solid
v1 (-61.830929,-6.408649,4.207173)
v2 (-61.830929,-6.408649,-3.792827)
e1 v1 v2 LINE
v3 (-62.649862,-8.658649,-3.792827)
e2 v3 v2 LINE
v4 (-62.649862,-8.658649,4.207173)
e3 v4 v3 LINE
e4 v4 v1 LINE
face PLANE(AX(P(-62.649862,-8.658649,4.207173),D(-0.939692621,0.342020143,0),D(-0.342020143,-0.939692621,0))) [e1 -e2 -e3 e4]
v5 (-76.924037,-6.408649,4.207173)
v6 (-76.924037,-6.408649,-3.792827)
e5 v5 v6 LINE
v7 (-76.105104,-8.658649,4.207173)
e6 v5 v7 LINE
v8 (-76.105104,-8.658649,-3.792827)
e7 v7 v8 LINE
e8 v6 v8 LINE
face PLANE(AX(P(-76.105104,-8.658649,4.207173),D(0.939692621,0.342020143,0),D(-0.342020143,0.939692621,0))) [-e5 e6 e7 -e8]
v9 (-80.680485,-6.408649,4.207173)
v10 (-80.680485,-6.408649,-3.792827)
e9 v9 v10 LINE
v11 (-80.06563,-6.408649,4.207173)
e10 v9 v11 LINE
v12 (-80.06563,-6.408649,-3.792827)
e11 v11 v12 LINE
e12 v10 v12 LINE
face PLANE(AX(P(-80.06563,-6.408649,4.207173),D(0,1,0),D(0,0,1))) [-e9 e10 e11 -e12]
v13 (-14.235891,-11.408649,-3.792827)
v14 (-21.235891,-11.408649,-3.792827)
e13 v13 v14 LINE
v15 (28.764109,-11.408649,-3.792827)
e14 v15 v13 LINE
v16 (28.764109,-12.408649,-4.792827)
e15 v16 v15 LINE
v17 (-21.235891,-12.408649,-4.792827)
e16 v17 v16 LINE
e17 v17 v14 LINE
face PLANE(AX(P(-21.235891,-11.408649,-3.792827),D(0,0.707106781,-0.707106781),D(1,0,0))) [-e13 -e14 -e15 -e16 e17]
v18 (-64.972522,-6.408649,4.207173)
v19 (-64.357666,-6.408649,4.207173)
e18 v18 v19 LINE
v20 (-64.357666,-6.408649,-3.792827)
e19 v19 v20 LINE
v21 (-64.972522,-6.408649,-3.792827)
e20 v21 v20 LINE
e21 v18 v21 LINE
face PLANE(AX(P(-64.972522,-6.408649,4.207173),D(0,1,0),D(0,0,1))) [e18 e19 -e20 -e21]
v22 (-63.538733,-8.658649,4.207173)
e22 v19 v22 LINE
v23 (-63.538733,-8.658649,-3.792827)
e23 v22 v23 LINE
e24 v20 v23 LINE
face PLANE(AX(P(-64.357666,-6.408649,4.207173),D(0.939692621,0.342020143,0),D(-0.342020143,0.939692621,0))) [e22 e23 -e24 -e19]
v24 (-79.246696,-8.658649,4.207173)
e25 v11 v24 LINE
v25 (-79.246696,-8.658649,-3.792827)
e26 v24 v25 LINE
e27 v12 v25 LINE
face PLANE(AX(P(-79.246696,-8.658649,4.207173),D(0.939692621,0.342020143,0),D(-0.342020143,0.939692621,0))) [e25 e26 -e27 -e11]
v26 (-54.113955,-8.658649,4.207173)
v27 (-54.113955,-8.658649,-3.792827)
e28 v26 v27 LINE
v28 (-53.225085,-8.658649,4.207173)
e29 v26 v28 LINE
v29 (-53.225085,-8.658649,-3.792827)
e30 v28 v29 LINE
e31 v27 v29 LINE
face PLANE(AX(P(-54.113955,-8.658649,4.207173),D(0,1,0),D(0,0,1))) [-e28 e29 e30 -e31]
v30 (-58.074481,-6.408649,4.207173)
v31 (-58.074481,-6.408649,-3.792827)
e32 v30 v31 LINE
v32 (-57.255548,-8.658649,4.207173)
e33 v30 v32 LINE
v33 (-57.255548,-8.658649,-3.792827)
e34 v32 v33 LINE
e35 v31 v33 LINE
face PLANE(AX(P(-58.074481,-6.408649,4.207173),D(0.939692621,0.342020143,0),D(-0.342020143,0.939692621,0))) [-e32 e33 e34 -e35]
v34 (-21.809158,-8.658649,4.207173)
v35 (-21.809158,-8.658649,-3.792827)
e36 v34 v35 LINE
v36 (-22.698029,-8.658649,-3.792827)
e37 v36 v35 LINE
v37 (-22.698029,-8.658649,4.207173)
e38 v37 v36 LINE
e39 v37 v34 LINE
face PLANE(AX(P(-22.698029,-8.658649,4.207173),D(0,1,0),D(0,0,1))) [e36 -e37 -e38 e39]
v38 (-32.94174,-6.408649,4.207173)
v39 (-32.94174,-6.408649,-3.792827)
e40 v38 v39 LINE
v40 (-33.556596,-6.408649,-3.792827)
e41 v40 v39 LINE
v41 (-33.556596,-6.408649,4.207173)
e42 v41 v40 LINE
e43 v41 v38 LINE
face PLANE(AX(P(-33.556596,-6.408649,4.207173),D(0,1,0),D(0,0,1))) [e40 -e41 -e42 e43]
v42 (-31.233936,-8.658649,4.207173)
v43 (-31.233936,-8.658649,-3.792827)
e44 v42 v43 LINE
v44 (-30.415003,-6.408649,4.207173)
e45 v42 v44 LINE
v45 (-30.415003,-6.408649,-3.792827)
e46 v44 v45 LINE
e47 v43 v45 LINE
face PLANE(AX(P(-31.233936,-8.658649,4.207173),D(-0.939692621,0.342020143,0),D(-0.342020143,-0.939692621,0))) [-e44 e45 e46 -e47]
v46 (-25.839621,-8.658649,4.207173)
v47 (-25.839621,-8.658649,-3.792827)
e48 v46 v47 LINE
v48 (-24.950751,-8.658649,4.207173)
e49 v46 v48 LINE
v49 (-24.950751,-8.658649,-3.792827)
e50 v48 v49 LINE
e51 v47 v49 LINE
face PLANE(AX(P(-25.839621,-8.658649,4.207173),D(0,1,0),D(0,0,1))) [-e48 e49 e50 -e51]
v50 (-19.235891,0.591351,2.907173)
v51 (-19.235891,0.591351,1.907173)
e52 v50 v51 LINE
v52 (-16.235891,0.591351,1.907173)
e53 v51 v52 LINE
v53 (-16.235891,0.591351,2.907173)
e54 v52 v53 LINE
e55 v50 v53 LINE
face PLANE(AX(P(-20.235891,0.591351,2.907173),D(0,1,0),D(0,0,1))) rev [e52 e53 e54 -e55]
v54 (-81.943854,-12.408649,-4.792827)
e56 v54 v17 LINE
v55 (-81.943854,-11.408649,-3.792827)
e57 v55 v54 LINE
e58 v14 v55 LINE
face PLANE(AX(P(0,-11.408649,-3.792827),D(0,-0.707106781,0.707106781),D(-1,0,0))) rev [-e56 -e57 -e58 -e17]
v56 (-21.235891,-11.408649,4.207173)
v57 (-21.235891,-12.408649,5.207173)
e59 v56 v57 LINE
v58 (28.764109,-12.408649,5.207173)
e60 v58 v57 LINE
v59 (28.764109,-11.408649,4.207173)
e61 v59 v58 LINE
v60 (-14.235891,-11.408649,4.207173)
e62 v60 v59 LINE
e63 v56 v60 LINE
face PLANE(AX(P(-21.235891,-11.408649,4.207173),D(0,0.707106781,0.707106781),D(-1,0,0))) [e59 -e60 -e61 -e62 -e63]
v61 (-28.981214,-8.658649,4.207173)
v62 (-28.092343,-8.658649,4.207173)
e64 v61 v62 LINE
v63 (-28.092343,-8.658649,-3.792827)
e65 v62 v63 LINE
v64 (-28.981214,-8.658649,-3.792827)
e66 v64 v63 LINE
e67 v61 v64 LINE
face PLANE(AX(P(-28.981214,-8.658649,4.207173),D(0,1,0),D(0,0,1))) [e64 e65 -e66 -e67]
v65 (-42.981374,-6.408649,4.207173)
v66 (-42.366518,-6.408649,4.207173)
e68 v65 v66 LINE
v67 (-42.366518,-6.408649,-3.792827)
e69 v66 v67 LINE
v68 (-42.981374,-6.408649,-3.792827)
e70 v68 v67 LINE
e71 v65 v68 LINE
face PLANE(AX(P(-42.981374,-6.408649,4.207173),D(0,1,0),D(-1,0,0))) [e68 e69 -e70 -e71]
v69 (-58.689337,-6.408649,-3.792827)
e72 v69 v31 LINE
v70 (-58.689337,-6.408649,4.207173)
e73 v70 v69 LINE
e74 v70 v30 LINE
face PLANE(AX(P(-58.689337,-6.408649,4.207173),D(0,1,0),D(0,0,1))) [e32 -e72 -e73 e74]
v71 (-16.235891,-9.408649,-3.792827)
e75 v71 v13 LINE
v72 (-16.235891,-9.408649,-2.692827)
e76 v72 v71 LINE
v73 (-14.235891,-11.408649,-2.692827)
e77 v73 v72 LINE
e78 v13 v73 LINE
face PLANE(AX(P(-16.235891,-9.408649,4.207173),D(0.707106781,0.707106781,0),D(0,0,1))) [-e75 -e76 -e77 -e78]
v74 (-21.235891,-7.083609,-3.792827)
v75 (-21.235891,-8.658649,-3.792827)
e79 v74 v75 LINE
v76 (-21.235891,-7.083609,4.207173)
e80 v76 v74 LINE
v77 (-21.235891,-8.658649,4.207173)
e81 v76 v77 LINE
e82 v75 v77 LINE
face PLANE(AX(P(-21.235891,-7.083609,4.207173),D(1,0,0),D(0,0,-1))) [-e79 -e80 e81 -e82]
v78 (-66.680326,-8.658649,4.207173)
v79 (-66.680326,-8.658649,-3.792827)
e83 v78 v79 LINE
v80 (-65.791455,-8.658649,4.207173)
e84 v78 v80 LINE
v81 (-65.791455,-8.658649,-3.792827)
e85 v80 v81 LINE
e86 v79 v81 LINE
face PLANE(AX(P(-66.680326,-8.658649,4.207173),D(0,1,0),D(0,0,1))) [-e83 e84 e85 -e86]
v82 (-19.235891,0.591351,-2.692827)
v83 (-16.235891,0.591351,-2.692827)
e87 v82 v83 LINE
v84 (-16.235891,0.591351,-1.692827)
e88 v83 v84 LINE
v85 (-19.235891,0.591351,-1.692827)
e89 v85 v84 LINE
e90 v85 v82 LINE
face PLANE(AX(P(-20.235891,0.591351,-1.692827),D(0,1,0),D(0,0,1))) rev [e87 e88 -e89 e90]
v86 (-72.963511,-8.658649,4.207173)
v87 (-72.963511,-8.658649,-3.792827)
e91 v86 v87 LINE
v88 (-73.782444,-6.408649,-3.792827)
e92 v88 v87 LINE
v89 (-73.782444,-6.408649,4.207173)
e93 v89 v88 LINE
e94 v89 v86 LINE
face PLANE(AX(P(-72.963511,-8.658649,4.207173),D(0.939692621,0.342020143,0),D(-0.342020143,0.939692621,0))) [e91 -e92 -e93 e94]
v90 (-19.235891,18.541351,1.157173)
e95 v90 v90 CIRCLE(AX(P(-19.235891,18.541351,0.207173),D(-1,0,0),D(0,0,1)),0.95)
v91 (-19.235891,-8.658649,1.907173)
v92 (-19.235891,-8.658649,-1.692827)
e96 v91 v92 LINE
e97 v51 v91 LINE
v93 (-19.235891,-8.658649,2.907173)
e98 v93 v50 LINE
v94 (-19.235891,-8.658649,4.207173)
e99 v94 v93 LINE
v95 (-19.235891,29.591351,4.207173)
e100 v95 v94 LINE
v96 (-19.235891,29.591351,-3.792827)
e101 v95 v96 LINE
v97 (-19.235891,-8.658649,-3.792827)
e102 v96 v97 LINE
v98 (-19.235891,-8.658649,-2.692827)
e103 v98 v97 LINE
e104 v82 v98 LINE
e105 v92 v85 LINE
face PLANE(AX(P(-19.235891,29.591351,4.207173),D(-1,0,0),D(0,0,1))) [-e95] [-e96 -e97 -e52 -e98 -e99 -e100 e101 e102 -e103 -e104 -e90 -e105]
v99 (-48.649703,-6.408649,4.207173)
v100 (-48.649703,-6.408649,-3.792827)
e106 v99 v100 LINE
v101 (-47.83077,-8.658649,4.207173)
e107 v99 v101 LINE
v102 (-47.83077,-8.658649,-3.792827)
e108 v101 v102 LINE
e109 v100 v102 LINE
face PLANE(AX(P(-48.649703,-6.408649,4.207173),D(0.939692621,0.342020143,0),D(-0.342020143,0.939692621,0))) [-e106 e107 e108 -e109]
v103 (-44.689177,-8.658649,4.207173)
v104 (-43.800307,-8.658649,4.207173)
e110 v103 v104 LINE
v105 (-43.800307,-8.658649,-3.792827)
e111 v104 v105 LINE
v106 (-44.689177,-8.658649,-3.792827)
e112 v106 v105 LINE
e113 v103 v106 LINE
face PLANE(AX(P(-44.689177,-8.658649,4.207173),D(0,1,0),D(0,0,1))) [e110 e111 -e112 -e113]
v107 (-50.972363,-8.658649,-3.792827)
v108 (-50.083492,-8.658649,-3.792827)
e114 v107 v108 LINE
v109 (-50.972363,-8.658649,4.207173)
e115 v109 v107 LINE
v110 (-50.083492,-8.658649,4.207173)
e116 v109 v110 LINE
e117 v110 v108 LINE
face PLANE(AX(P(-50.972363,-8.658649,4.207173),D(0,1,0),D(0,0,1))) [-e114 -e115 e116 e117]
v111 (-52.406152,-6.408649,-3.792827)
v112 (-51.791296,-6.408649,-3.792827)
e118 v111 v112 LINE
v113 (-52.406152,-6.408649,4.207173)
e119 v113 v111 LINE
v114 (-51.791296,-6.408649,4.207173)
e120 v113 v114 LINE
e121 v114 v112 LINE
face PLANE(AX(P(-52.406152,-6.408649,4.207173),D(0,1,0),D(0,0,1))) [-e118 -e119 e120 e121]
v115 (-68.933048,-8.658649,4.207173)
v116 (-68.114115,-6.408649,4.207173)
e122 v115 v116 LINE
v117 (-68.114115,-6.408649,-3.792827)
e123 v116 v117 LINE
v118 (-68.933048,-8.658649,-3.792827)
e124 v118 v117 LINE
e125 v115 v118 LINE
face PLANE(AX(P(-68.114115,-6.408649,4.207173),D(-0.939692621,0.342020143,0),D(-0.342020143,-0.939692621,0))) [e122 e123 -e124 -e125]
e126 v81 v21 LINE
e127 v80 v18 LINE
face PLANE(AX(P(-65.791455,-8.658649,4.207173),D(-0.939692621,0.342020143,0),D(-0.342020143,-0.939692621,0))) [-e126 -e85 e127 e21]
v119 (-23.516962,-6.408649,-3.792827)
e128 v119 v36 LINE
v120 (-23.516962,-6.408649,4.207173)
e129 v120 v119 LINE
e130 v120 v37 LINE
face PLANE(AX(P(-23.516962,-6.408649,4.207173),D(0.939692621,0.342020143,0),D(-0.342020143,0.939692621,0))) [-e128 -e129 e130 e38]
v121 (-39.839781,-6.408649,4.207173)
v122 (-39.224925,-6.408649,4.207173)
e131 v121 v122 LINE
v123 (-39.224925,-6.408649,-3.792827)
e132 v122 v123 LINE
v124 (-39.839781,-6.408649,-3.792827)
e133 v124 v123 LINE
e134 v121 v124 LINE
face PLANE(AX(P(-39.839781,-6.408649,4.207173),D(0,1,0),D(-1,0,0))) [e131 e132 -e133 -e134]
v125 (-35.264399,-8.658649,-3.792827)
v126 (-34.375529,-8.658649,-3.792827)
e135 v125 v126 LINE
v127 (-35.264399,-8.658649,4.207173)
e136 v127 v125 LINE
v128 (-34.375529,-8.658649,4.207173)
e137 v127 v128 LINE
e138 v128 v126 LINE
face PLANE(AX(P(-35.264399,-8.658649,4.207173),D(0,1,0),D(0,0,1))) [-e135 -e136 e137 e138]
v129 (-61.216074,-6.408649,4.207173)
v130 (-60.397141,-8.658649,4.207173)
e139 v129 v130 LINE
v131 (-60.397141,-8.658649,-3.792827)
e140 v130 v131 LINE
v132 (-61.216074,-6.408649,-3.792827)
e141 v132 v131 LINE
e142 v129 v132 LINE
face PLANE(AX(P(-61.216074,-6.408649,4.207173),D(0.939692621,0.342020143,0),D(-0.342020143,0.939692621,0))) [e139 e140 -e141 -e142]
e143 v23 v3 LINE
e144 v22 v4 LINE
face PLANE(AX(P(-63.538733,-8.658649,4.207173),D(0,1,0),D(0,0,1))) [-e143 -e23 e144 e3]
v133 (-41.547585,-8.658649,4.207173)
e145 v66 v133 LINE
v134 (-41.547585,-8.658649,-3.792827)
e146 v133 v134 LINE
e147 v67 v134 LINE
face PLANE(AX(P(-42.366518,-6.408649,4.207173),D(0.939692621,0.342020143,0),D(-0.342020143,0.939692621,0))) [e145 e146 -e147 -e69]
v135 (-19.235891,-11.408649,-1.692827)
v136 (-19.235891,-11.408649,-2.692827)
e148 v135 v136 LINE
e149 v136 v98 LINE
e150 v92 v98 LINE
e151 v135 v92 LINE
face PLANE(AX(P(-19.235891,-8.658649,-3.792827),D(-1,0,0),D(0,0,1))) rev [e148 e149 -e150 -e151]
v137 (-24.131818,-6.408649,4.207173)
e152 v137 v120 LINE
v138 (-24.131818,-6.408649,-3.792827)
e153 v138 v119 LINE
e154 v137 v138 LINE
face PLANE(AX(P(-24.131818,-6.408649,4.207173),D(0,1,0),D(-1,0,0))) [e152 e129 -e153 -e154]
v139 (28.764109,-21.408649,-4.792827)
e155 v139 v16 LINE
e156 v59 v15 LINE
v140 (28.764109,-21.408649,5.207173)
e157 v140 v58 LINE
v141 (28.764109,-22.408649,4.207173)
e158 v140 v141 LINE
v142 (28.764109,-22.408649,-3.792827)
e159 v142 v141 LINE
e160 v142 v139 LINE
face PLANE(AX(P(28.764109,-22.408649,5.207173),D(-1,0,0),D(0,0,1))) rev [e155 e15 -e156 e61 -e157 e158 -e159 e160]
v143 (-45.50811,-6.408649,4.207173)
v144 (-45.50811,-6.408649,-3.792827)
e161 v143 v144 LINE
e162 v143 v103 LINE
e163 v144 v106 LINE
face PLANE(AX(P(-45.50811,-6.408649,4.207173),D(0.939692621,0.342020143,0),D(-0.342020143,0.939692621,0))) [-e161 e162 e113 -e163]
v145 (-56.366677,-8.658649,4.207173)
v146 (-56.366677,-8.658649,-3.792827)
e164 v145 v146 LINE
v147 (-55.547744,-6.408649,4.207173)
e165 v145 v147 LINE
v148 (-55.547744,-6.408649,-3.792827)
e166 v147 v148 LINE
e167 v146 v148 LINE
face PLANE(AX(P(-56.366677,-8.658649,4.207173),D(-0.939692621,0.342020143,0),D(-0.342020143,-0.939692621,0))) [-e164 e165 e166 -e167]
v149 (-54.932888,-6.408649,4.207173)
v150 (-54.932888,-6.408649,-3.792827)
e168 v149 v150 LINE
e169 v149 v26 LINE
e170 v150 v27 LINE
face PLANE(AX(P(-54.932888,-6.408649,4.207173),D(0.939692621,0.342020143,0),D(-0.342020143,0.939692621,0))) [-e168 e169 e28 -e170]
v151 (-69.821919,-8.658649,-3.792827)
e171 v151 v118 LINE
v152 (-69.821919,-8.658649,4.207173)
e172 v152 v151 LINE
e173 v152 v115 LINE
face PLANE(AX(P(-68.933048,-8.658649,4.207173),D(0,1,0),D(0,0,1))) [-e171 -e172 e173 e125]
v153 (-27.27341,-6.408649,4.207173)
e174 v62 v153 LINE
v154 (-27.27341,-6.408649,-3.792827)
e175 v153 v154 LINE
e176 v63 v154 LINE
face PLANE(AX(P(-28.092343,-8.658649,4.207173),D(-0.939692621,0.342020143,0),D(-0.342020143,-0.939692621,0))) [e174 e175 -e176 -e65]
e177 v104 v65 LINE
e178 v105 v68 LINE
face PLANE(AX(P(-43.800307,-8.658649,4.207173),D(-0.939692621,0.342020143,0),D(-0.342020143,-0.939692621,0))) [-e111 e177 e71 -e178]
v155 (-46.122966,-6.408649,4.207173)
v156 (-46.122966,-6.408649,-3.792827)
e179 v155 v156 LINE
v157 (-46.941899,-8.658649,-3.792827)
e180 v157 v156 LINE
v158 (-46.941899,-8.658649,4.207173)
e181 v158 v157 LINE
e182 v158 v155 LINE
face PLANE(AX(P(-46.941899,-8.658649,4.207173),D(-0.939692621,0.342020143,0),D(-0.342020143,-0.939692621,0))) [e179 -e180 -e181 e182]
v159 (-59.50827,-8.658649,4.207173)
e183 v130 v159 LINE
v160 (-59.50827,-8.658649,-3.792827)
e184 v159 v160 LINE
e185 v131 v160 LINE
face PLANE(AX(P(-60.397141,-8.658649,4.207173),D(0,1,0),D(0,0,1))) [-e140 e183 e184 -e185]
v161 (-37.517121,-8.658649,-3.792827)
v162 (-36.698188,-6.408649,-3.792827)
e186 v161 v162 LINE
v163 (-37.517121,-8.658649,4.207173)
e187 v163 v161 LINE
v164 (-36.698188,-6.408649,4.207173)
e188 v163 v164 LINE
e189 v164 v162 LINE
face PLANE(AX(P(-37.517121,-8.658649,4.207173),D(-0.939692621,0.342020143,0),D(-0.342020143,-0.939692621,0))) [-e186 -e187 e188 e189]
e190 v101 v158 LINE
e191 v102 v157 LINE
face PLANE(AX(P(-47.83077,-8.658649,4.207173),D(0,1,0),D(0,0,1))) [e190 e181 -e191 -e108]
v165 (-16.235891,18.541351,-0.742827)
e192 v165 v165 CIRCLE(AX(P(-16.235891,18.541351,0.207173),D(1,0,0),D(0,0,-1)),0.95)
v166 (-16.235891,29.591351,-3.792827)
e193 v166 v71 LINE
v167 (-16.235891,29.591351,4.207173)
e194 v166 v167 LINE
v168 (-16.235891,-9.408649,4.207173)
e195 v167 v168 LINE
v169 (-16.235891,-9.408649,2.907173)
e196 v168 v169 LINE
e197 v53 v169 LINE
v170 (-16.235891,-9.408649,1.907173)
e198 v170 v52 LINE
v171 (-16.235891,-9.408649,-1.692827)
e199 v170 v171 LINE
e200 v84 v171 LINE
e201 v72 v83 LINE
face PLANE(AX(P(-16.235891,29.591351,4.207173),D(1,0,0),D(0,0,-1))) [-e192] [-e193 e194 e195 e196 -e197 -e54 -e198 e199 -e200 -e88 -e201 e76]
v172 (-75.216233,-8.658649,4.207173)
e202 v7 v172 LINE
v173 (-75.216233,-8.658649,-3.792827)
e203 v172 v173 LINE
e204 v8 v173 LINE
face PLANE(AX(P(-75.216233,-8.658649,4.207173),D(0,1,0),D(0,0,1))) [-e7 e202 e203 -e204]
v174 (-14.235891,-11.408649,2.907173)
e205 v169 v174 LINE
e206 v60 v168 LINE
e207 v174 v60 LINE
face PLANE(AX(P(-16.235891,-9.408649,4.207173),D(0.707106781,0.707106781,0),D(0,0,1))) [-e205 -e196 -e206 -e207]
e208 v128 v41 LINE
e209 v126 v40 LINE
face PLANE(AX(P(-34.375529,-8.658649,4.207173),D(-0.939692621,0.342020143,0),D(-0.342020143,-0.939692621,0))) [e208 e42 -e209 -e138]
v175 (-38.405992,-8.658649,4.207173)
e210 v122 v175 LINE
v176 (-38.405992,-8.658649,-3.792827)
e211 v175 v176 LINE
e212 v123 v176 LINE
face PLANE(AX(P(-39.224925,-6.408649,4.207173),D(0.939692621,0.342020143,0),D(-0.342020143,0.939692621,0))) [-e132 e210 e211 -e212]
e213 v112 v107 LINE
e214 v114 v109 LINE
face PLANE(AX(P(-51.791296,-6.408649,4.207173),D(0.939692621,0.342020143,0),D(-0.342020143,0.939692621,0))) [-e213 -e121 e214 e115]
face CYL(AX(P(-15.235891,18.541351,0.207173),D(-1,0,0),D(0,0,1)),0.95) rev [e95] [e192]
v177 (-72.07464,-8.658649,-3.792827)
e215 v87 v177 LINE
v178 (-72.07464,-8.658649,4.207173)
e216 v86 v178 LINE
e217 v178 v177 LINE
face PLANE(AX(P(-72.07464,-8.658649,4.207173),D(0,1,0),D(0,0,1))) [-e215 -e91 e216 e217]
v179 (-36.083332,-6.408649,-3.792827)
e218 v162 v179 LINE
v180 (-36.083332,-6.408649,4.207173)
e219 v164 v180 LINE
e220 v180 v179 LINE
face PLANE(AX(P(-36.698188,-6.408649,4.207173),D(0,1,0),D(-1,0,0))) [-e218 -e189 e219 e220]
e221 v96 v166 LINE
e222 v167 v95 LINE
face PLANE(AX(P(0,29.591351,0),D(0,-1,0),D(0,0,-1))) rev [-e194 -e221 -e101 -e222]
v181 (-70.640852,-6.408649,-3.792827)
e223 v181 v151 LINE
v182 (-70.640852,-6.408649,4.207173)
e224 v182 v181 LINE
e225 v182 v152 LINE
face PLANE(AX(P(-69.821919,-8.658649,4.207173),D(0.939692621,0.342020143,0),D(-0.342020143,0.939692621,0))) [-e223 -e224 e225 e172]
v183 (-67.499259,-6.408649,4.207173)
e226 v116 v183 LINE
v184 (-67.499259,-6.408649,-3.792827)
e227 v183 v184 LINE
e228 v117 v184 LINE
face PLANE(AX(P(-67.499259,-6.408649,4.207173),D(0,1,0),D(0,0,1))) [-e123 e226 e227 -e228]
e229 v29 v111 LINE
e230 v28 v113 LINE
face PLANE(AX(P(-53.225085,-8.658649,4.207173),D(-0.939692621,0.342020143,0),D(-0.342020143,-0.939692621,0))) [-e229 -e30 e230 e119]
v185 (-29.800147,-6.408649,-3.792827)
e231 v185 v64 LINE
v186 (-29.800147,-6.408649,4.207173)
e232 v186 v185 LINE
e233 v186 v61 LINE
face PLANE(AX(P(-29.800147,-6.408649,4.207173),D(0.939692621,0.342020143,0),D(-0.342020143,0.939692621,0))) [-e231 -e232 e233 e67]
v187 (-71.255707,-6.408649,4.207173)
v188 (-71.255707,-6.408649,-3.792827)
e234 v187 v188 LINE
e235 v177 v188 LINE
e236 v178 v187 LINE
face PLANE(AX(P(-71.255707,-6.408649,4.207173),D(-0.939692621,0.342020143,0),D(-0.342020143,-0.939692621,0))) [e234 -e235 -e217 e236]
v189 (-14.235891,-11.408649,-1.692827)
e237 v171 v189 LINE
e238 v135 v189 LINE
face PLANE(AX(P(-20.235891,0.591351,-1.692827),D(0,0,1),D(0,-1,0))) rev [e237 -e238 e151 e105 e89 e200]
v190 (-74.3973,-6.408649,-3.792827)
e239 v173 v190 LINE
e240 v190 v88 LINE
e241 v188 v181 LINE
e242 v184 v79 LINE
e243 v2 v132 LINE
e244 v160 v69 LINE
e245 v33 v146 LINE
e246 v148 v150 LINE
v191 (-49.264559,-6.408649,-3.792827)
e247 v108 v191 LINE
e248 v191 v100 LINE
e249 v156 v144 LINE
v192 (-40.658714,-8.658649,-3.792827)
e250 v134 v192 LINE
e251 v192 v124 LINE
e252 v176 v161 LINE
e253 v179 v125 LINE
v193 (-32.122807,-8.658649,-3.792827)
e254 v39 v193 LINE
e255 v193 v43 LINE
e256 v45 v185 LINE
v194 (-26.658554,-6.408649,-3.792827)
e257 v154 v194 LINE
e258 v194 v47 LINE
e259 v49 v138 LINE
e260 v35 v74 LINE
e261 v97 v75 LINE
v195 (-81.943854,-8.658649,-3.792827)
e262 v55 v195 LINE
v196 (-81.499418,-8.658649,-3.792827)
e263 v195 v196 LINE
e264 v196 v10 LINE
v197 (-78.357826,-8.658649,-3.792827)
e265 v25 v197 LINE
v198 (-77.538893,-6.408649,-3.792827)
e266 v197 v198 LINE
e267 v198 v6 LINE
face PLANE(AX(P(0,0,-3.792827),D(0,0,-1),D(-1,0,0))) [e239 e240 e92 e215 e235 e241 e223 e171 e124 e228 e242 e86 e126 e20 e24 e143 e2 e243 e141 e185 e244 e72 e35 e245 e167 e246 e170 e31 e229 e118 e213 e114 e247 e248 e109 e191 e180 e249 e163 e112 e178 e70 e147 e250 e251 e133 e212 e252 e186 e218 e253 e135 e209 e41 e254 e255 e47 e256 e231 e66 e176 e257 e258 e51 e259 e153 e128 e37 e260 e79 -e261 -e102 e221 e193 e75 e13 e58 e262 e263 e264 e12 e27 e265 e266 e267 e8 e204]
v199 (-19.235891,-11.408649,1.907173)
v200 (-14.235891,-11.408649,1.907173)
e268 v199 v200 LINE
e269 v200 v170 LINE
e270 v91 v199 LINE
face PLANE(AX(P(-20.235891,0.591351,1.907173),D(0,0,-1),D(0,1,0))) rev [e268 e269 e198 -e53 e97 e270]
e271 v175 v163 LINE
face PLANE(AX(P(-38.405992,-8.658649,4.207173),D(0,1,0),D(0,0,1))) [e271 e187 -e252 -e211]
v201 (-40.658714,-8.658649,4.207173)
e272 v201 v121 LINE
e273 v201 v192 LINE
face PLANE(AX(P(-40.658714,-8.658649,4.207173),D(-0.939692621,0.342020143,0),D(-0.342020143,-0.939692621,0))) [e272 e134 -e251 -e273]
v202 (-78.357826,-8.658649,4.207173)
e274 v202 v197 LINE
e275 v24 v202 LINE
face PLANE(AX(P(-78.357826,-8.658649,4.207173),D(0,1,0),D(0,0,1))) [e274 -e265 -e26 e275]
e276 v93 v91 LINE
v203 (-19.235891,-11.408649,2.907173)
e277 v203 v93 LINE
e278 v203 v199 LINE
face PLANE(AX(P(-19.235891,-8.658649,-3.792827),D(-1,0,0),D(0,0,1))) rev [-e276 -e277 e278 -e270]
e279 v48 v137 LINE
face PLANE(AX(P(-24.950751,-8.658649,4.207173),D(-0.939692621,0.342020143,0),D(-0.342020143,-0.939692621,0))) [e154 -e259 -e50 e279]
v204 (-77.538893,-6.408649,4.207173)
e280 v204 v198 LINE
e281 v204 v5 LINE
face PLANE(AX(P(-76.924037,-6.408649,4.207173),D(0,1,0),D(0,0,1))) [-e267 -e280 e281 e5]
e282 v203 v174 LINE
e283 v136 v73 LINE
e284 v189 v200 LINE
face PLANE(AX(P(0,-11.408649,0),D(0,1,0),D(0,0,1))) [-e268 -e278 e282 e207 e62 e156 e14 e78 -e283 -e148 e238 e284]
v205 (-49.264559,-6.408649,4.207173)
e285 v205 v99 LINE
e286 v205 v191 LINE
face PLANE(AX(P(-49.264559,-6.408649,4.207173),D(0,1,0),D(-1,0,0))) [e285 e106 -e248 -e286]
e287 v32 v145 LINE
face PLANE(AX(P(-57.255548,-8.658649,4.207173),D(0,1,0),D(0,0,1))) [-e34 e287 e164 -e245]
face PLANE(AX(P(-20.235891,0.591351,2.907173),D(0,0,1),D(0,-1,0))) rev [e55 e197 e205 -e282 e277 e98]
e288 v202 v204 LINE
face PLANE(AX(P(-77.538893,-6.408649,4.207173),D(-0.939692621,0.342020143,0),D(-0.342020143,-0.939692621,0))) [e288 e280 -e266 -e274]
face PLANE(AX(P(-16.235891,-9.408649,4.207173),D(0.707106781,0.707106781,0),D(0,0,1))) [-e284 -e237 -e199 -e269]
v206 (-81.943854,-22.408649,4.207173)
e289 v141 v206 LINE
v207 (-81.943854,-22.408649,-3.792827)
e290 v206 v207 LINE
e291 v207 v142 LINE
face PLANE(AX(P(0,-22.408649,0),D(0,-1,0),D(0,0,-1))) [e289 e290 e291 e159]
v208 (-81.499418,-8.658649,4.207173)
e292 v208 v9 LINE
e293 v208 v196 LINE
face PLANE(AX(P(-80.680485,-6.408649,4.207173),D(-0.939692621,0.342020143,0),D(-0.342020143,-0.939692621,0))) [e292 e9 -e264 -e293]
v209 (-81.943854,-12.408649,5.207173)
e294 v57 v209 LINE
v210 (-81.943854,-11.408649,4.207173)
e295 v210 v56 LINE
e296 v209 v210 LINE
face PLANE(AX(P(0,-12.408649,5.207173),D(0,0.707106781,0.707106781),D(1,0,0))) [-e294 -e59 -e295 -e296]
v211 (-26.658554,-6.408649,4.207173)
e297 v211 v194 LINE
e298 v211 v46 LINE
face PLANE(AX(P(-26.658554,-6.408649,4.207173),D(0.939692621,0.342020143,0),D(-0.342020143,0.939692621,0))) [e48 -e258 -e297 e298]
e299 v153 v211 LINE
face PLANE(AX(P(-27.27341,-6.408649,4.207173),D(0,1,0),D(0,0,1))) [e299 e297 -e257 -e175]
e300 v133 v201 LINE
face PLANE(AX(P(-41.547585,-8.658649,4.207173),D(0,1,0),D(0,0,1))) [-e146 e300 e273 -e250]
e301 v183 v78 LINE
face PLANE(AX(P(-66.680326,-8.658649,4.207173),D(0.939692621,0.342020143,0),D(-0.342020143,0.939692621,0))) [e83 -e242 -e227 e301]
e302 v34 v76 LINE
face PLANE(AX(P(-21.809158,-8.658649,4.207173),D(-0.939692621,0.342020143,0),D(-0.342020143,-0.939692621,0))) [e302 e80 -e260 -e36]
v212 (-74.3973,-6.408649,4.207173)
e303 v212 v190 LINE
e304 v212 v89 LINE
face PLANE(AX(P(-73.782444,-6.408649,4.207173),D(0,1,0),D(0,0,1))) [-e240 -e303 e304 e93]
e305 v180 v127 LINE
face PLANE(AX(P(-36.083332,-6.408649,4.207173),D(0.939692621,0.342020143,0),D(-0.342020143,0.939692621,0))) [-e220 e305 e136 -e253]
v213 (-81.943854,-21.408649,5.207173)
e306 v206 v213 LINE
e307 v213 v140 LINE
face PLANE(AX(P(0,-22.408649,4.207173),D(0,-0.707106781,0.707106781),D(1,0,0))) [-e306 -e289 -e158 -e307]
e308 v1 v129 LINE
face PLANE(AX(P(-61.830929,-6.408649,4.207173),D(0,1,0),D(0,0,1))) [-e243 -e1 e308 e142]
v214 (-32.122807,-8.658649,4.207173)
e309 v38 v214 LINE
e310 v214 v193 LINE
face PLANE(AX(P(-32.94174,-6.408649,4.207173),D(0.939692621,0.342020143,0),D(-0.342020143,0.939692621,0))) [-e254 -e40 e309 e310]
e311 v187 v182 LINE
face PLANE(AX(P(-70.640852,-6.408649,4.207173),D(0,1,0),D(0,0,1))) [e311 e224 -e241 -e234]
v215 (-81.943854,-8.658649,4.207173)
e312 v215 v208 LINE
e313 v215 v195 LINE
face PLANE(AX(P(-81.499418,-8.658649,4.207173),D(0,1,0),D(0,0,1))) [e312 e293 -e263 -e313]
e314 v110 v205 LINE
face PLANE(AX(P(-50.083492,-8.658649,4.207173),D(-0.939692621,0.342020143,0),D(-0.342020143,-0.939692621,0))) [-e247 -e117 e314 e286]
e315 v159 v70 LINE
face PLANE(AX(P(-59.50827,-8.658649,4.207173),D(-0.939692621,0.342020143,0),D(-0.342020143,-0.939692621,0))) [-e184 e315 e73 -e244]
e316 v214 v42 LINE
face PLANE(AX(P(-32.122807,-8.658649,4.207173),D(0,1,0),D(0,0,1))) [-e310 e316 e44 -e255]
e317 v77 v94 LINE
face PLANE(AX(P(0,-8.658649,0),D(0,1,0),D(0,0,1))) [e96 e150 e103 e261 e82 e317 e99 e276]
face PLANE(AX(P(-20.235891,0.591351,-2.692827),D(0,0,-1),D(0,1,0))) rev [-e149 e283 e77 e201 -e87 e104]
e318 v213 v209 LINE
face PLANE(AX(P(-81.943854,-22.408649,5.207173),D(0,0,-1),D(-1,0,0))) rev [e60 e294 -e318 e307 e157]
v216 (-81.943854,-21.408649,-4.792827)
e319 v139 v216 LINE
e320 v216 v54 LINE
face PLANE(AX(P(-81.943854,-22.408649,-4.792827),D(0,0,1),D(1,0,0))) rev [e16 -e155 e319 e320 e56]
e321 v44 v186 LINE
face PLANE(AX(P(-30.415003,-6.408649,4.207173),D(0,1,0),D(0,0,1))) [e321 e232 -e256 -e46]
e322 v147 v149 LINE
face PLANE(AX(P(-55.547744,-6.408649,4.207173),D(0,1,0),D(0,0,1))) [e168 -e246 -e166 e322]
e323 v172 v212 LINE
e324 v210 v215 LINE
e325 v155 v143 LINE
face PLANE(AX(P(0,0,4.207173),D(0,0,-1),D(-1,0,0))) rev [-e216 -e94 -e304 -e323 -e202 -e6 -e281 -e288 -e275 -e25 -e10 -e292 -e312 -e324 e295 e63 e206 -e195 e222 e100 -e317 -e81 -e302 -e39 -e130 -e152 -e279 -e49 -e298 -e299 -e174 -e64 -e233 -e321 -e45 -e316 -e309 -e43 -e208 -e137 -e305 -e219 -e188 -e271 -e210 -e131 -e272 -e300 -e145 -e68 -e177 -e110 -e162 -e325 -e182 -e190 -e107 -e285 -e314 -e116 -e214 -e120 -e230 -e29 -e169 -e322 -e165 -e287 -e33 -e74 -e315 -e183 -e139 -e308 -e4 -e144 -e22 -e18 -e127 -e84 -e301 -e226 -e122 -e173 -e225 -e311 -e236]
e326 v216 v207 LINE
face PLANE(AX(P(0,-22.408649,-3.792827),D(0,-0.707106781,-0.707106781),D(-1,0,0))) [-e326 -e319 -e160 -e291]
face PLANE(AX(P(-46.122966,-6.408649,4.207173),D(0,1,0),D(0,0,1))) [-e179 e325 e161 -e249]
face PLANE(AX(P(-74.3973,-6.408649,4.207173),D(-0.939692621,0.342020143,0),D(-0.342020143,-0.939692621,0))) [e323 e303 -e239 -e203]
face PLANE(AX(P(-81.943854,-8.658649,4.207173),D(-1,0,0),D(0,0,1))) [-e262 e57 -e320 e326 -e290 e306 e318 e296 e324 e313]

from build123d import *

# Parameters (mm, degrees)
BOSS_EXTRUDE1_DEPTH = 8
SKETCH2_W           = 110.70796325
SKETCH2_H           = 10
BOSS_EXTRUDE2_DEPTH = 10
CHAMFER1_SIZE       = 1
CHAMFER2_SIZE       = 1
SKETCH3_W           = 50
SKETCH3_H           = 8
BOSS_EXTRUDE3_DEPTH = 1
CHAMFER3_SIZE       = 1
CHAMFER4_SIZE       = 1
SKETCH4_W           = 3
SKETCH4_H           = 8
BOSS_EXTRUDE6_DEPTH = 52
SKETCH10_W          = 1
SKETCH10_H          = 12
CUT_EXTRUDE4_DEPTH  = 4
CHAMFER7_SIZE       = 2
SKETCH12_R          = 0.95
CUT_EXTRUDE5_DEPTH  = 4
CHAMFER8_SIZE       = 1
SKETCH13_W          = 2
SKETCH13_H          = 8
BOSS_EXTRUDE7_DEPTH = 2.75


# Some blends are built 0.0001 mm under size
with BuildPart() as part:
    # Sketch1 → Boss-Extrude1 (new body)
    with BuildSketch(Plane(origin=(0, 0, -3.792826984), x_dir=(-1, 0, 0), z_dir=(0, 0, -1))):
        Polygon((23.516961809, -6.40864854), (22.698028781, -8.65864854), (21.809158042, -8.65864854), (21.235890512, -7.083608945), (21.235890512, -12.40864854), (66.235890512, -12.40864854), (81.943853762, -12.40864854), (81.943853762, -8.65864854), (81.499418392, -8.65864854), (80.680485365, -6.40864854), (80.065629509, -6.40864854), (79.246696481, -8.65864854), (78.357825742, -8.65864854), (77.538892715, -6.40864854), (76.924036859, -6.40864854), (76.105103831, -8.65864854), (75.216233092, -8.65864854), (74.397300065, -6.40864854), (73.782444209, -6.40864854), (72.963511181, -8.65864854), (72.074640442, -8.65864854), (71.255707415, -6.40864854), (70.640851559, -6.40864854), (69.821918531, -8.65864854), (68.933047792, -8.65864854), (68.114114765, -6.40864854), (67.499258909, -6.40864854), (66.680325881, -8.65864854), (65.791455142, -8.65864854), (64.972522115, -6.40864854), (64.357666259, -6.40864854), (63.538733231, -8.65864854), (62.649862492, -8.65864854), (61.830929465, -6.40864854), (61.216073609, -6.40864854), (60.397140581, -8.65864854), (59.508269842, -8.65864854), (58.689336815, -6.40864854), (58.074480959, -6.40864854), (57.255547931, -8.65864854), (56.366677192, -8.65864854), (55.547744165, -6.40864854), (54.932888309, -6.40864854), (54.113955281, -8.65864854), (53.225084542, -8.65864854), (52.406151515, -6.40864854), (51.791295659, -6.40864854), (50.972362631, -8.65864854), (50.083491892, -8.65864854), (49.264558865, -6.40864854), (48.649703009, -6.40864854), (47.830769981, -8.65864854), (46.941899242, -8.65864854), (46.122966215, -6.40864854), (45.508110359, -6.40864854), (44.689177331, -8.65864854), (43.800306592, -8.65864854), (42.981373565, -6.40864854), (42.366517709, -6.40864854), (41.547584681, -8.65864854), (40.658713942, -8.65864854), (39.839780915, -6.40864854), (39.224925059, -6.40864854), (38.405992031, -8.65864854), (37.517121292, -8.65864854), (36.698188265, -6.40864854), (36.083332409, -6.40864854), (35.264399381, -8.65864854), (34.375528642, -8.65864854), (33.556595615, -6.40864854), (32.941739759, -6.40864854), (32.122806731, -8.65864854), (31.233935992, -8.65864854), (30.415002965, -6.40864854), (29.800147109, -6.40864854), (28.981214081, -8.65864854), (28.092343342, -8.65864854), (27.273410315, -6.40864854), (26.658554459, -6.40864854), (25.839621431, -8.65864854), (24.950750692, -8.65864854), (24.131817665, -6.40864854), align=None)
    extrude(amount=-BOSS_EXTRUDE1_DEPTH)

    # Sketch2 → Boss-Extrude2 (add)
    with BuildSketch(Plane.XZ.offset(12.40864854)):
        with Locations((-26.589872137, 0.207173016)):
            Rectangle(SKETCH2_W, SKETCH2_H)
    extrude(amount=BOSS_EXTRUDE2_DEPTH)

    # Chamfer1
    chamfer1_edges = [part.edges().sort_by_distance(p)[0] for p in [
        (-51.589872137, -12.40864854, 4.207173016),
    ]]
    chamfer(chamfer1_edges, length=CHAMFER1_SIZE - 0.0001)  # a hair under: the kernel refuses the full size

    # Chamfer2
    chamfer2_edges = [part.edges().sort_by_distance(p)[0] for p in [
        (-51.589872137, -12.40864854, -3.792826984),
    ]]
    chamfer(chamfer2_edges, length=CHAMFER2_SIZE - 0.0001)  # a hair under: the kernel refuses the full size

    # Sketch3 → Boss-Extrude3 (add)
    with BuildSketch(Plane(origin=(0, -12.40864854, 0), x_dir=(1, 0, 0), z_dir=(0, 1, 0))):
        with Locations((3.764109488, -0.207173016)):
            Rectangle(SKETCH3_W, SKETCH3_H)
    extrude(amount=BOSS_EXTRUDE3_DEPTH)

    # Chamfer3
    # the kernel refuses this chamfer: 1 mm, written as the material it adds along each edge
    with BuildSketch(Plane(origin=(28.764109488, -12.40864854, 4.207173016), x_dir=(0, 0, 1), z_dir=(-1, 0, 0))) as chamfer3_piece_1_section:
        Polygon((CHAMFER3_SIZE, 0), (0, CHAMFER3_SIZE), (0, 0), align=None)
    chamfer3_piece_1 = extrude(amount=50, mode=Mode.PRIVATE)
    chamfer3_piece_1 = split(chamfer3_piece_1, bisect_by=Plane(origin=(28.764109488, -12.40864854, 5.207173016), z_dir=(0, 0, -1)), keep=Keep.TOP, mode=Mode.PRIVATE)
    chamfer3_piece_1 = split(chamfer3_piece_1, bisect_by=Plane(origin=(28.764109488, -11.40864854, 4.207173016), z_dir=(0, -1, 0)), keep=Keep.TOP, mode=Mode.PRIVATE)
    add(chamfer3_piece_1)
    with BuildSketch(Plane(origin=(28.764109488, -12.40864854, 4.207173016), x_dir=(0, 0, 1), z_dir=(-1, 0, 0))) as chamfer3_piece_2_section:
        Polygon((CHAMFER3_SIZE, 0), (0, CHAMFER3_SIZE), (0, 0), align=None)
    chamfer3_piece_2 = extrude(amount=52.571682988, mode=Mode.PRIVATE)
    chamfer3_piece_2 = split(chamfer3_piece_2, bisect_by=Plane(origin=(-21.235890512, -12.40864854, 4.207173016), z_dir=(-1, 0, 0)), keep=Keep.TOP, mode=Mode.PRIVATE)
    chamfer3_piece_2 = split(chamfer3_piece_2, bisect_by=Plane(origin=(28.764109488, -12.40864854, 5.207173016), z_dir=(0, 0, -1)), keep=Keep.TOP, mode=Mode.PRIVATE)
    chamfer3_piece_2 = split(chamfer3_piece_2, bisect_by=Plane(origin=(28.764109488, -11.40864854, 4.207173016), z_dir=(0, -1, 0)), keep=Keep.TOP, mode=Mode.PRIVATE)
    add(chamfer3_piece_2)

    # Chamfer4
    chamfer4_edges = [part.edges().sort_by_distance(p)[0] for p in [
        (3.764109488, -12.40864854, -3.792826984),
    ]]
    chamfer(chamfer4_edges, length=CHAMFER4_SIZE - 0.0001)  # a hair under: the kernel refuses the full size

    # Sketch4 → Boss-Extrude6 (add)
    with BuildSketch(Plane.XZ.offset(22.40864854)):
        with Locations((-17.735890512, 0.207173016)):
            Rectangle(SKETCH4_W, SKETCH4_H)
    extrude(amount=-BOSS_EXTRUDE6_DEPTH)

    # Sketch10 → Cut-Extrude4 (cut)
    with BuildSketch(Plane(origin=(-16.235890512, 0, 0), x_dir=(0, 0, -1), z_dir=(1, 0, 0))):
        with Locations((-2.407173016, -5.40864854)):
            Rectangle(SKETCH10_W, SKETCH10_H)
        with Locations((2.192826984, -5.40864854)):
            Rectangle(SKETCH10_W, SKETCH10_H)
    extrude(amount=-CUT_EXTRUDE4_DEPTH, mode=Mode.SUBTRACT)

    # Chamfer7
    chamfer7_edges = [part.edges().sort_by_distance(p)[0] for p in [
        (-16.235890512, -11.40864854, 3.557173016),
        (-16.235890512, -11.40864854, 0.107173016),
        (-16.235890512, -11.40864854, -3.242826984),
    ]]
    chamfer(chamfer7_edges, length=CHAMFER7_SIZE)

    # Sketch12 → Cut-Extrude5 (cut)
    with BuildSketch(Plane.ZY.offset(19.235890512)):
        with Locations((0.207173016, 18.54135146)):
            Circle(SKETCH12_R)
    extrude(amount=-CUT_EXTRUDE5_DEPTH, mode=Mode.SUBTRACT)

    # Chamfer8
    chamfer8_edges = [part.edges().sort_by_distance(p)[0] for p in [
        (-26.589872137, -22.40864854, -4.792826984),
        (-26.589872137, -22.40864854, 5.207173016),
    ]]
    chamfer(chamfer8_edges, length=CHAMFER8_SIZE)

    # Sketch13 → Boss-Extrude7 (add)
    with BuildSketch(Plane(origin=(0, -11.40864854, 0), x_dir=(1, 0, 0), z_dir=(0, 1, 0))):
        with Locations((-20.235890512, -0.207173016)):
            Rectangle(SKETCH13_W, SKETCH13_H)
    extrude(amount=BOSS_EXTRUDE7_DEPTH)


solid = part.part
